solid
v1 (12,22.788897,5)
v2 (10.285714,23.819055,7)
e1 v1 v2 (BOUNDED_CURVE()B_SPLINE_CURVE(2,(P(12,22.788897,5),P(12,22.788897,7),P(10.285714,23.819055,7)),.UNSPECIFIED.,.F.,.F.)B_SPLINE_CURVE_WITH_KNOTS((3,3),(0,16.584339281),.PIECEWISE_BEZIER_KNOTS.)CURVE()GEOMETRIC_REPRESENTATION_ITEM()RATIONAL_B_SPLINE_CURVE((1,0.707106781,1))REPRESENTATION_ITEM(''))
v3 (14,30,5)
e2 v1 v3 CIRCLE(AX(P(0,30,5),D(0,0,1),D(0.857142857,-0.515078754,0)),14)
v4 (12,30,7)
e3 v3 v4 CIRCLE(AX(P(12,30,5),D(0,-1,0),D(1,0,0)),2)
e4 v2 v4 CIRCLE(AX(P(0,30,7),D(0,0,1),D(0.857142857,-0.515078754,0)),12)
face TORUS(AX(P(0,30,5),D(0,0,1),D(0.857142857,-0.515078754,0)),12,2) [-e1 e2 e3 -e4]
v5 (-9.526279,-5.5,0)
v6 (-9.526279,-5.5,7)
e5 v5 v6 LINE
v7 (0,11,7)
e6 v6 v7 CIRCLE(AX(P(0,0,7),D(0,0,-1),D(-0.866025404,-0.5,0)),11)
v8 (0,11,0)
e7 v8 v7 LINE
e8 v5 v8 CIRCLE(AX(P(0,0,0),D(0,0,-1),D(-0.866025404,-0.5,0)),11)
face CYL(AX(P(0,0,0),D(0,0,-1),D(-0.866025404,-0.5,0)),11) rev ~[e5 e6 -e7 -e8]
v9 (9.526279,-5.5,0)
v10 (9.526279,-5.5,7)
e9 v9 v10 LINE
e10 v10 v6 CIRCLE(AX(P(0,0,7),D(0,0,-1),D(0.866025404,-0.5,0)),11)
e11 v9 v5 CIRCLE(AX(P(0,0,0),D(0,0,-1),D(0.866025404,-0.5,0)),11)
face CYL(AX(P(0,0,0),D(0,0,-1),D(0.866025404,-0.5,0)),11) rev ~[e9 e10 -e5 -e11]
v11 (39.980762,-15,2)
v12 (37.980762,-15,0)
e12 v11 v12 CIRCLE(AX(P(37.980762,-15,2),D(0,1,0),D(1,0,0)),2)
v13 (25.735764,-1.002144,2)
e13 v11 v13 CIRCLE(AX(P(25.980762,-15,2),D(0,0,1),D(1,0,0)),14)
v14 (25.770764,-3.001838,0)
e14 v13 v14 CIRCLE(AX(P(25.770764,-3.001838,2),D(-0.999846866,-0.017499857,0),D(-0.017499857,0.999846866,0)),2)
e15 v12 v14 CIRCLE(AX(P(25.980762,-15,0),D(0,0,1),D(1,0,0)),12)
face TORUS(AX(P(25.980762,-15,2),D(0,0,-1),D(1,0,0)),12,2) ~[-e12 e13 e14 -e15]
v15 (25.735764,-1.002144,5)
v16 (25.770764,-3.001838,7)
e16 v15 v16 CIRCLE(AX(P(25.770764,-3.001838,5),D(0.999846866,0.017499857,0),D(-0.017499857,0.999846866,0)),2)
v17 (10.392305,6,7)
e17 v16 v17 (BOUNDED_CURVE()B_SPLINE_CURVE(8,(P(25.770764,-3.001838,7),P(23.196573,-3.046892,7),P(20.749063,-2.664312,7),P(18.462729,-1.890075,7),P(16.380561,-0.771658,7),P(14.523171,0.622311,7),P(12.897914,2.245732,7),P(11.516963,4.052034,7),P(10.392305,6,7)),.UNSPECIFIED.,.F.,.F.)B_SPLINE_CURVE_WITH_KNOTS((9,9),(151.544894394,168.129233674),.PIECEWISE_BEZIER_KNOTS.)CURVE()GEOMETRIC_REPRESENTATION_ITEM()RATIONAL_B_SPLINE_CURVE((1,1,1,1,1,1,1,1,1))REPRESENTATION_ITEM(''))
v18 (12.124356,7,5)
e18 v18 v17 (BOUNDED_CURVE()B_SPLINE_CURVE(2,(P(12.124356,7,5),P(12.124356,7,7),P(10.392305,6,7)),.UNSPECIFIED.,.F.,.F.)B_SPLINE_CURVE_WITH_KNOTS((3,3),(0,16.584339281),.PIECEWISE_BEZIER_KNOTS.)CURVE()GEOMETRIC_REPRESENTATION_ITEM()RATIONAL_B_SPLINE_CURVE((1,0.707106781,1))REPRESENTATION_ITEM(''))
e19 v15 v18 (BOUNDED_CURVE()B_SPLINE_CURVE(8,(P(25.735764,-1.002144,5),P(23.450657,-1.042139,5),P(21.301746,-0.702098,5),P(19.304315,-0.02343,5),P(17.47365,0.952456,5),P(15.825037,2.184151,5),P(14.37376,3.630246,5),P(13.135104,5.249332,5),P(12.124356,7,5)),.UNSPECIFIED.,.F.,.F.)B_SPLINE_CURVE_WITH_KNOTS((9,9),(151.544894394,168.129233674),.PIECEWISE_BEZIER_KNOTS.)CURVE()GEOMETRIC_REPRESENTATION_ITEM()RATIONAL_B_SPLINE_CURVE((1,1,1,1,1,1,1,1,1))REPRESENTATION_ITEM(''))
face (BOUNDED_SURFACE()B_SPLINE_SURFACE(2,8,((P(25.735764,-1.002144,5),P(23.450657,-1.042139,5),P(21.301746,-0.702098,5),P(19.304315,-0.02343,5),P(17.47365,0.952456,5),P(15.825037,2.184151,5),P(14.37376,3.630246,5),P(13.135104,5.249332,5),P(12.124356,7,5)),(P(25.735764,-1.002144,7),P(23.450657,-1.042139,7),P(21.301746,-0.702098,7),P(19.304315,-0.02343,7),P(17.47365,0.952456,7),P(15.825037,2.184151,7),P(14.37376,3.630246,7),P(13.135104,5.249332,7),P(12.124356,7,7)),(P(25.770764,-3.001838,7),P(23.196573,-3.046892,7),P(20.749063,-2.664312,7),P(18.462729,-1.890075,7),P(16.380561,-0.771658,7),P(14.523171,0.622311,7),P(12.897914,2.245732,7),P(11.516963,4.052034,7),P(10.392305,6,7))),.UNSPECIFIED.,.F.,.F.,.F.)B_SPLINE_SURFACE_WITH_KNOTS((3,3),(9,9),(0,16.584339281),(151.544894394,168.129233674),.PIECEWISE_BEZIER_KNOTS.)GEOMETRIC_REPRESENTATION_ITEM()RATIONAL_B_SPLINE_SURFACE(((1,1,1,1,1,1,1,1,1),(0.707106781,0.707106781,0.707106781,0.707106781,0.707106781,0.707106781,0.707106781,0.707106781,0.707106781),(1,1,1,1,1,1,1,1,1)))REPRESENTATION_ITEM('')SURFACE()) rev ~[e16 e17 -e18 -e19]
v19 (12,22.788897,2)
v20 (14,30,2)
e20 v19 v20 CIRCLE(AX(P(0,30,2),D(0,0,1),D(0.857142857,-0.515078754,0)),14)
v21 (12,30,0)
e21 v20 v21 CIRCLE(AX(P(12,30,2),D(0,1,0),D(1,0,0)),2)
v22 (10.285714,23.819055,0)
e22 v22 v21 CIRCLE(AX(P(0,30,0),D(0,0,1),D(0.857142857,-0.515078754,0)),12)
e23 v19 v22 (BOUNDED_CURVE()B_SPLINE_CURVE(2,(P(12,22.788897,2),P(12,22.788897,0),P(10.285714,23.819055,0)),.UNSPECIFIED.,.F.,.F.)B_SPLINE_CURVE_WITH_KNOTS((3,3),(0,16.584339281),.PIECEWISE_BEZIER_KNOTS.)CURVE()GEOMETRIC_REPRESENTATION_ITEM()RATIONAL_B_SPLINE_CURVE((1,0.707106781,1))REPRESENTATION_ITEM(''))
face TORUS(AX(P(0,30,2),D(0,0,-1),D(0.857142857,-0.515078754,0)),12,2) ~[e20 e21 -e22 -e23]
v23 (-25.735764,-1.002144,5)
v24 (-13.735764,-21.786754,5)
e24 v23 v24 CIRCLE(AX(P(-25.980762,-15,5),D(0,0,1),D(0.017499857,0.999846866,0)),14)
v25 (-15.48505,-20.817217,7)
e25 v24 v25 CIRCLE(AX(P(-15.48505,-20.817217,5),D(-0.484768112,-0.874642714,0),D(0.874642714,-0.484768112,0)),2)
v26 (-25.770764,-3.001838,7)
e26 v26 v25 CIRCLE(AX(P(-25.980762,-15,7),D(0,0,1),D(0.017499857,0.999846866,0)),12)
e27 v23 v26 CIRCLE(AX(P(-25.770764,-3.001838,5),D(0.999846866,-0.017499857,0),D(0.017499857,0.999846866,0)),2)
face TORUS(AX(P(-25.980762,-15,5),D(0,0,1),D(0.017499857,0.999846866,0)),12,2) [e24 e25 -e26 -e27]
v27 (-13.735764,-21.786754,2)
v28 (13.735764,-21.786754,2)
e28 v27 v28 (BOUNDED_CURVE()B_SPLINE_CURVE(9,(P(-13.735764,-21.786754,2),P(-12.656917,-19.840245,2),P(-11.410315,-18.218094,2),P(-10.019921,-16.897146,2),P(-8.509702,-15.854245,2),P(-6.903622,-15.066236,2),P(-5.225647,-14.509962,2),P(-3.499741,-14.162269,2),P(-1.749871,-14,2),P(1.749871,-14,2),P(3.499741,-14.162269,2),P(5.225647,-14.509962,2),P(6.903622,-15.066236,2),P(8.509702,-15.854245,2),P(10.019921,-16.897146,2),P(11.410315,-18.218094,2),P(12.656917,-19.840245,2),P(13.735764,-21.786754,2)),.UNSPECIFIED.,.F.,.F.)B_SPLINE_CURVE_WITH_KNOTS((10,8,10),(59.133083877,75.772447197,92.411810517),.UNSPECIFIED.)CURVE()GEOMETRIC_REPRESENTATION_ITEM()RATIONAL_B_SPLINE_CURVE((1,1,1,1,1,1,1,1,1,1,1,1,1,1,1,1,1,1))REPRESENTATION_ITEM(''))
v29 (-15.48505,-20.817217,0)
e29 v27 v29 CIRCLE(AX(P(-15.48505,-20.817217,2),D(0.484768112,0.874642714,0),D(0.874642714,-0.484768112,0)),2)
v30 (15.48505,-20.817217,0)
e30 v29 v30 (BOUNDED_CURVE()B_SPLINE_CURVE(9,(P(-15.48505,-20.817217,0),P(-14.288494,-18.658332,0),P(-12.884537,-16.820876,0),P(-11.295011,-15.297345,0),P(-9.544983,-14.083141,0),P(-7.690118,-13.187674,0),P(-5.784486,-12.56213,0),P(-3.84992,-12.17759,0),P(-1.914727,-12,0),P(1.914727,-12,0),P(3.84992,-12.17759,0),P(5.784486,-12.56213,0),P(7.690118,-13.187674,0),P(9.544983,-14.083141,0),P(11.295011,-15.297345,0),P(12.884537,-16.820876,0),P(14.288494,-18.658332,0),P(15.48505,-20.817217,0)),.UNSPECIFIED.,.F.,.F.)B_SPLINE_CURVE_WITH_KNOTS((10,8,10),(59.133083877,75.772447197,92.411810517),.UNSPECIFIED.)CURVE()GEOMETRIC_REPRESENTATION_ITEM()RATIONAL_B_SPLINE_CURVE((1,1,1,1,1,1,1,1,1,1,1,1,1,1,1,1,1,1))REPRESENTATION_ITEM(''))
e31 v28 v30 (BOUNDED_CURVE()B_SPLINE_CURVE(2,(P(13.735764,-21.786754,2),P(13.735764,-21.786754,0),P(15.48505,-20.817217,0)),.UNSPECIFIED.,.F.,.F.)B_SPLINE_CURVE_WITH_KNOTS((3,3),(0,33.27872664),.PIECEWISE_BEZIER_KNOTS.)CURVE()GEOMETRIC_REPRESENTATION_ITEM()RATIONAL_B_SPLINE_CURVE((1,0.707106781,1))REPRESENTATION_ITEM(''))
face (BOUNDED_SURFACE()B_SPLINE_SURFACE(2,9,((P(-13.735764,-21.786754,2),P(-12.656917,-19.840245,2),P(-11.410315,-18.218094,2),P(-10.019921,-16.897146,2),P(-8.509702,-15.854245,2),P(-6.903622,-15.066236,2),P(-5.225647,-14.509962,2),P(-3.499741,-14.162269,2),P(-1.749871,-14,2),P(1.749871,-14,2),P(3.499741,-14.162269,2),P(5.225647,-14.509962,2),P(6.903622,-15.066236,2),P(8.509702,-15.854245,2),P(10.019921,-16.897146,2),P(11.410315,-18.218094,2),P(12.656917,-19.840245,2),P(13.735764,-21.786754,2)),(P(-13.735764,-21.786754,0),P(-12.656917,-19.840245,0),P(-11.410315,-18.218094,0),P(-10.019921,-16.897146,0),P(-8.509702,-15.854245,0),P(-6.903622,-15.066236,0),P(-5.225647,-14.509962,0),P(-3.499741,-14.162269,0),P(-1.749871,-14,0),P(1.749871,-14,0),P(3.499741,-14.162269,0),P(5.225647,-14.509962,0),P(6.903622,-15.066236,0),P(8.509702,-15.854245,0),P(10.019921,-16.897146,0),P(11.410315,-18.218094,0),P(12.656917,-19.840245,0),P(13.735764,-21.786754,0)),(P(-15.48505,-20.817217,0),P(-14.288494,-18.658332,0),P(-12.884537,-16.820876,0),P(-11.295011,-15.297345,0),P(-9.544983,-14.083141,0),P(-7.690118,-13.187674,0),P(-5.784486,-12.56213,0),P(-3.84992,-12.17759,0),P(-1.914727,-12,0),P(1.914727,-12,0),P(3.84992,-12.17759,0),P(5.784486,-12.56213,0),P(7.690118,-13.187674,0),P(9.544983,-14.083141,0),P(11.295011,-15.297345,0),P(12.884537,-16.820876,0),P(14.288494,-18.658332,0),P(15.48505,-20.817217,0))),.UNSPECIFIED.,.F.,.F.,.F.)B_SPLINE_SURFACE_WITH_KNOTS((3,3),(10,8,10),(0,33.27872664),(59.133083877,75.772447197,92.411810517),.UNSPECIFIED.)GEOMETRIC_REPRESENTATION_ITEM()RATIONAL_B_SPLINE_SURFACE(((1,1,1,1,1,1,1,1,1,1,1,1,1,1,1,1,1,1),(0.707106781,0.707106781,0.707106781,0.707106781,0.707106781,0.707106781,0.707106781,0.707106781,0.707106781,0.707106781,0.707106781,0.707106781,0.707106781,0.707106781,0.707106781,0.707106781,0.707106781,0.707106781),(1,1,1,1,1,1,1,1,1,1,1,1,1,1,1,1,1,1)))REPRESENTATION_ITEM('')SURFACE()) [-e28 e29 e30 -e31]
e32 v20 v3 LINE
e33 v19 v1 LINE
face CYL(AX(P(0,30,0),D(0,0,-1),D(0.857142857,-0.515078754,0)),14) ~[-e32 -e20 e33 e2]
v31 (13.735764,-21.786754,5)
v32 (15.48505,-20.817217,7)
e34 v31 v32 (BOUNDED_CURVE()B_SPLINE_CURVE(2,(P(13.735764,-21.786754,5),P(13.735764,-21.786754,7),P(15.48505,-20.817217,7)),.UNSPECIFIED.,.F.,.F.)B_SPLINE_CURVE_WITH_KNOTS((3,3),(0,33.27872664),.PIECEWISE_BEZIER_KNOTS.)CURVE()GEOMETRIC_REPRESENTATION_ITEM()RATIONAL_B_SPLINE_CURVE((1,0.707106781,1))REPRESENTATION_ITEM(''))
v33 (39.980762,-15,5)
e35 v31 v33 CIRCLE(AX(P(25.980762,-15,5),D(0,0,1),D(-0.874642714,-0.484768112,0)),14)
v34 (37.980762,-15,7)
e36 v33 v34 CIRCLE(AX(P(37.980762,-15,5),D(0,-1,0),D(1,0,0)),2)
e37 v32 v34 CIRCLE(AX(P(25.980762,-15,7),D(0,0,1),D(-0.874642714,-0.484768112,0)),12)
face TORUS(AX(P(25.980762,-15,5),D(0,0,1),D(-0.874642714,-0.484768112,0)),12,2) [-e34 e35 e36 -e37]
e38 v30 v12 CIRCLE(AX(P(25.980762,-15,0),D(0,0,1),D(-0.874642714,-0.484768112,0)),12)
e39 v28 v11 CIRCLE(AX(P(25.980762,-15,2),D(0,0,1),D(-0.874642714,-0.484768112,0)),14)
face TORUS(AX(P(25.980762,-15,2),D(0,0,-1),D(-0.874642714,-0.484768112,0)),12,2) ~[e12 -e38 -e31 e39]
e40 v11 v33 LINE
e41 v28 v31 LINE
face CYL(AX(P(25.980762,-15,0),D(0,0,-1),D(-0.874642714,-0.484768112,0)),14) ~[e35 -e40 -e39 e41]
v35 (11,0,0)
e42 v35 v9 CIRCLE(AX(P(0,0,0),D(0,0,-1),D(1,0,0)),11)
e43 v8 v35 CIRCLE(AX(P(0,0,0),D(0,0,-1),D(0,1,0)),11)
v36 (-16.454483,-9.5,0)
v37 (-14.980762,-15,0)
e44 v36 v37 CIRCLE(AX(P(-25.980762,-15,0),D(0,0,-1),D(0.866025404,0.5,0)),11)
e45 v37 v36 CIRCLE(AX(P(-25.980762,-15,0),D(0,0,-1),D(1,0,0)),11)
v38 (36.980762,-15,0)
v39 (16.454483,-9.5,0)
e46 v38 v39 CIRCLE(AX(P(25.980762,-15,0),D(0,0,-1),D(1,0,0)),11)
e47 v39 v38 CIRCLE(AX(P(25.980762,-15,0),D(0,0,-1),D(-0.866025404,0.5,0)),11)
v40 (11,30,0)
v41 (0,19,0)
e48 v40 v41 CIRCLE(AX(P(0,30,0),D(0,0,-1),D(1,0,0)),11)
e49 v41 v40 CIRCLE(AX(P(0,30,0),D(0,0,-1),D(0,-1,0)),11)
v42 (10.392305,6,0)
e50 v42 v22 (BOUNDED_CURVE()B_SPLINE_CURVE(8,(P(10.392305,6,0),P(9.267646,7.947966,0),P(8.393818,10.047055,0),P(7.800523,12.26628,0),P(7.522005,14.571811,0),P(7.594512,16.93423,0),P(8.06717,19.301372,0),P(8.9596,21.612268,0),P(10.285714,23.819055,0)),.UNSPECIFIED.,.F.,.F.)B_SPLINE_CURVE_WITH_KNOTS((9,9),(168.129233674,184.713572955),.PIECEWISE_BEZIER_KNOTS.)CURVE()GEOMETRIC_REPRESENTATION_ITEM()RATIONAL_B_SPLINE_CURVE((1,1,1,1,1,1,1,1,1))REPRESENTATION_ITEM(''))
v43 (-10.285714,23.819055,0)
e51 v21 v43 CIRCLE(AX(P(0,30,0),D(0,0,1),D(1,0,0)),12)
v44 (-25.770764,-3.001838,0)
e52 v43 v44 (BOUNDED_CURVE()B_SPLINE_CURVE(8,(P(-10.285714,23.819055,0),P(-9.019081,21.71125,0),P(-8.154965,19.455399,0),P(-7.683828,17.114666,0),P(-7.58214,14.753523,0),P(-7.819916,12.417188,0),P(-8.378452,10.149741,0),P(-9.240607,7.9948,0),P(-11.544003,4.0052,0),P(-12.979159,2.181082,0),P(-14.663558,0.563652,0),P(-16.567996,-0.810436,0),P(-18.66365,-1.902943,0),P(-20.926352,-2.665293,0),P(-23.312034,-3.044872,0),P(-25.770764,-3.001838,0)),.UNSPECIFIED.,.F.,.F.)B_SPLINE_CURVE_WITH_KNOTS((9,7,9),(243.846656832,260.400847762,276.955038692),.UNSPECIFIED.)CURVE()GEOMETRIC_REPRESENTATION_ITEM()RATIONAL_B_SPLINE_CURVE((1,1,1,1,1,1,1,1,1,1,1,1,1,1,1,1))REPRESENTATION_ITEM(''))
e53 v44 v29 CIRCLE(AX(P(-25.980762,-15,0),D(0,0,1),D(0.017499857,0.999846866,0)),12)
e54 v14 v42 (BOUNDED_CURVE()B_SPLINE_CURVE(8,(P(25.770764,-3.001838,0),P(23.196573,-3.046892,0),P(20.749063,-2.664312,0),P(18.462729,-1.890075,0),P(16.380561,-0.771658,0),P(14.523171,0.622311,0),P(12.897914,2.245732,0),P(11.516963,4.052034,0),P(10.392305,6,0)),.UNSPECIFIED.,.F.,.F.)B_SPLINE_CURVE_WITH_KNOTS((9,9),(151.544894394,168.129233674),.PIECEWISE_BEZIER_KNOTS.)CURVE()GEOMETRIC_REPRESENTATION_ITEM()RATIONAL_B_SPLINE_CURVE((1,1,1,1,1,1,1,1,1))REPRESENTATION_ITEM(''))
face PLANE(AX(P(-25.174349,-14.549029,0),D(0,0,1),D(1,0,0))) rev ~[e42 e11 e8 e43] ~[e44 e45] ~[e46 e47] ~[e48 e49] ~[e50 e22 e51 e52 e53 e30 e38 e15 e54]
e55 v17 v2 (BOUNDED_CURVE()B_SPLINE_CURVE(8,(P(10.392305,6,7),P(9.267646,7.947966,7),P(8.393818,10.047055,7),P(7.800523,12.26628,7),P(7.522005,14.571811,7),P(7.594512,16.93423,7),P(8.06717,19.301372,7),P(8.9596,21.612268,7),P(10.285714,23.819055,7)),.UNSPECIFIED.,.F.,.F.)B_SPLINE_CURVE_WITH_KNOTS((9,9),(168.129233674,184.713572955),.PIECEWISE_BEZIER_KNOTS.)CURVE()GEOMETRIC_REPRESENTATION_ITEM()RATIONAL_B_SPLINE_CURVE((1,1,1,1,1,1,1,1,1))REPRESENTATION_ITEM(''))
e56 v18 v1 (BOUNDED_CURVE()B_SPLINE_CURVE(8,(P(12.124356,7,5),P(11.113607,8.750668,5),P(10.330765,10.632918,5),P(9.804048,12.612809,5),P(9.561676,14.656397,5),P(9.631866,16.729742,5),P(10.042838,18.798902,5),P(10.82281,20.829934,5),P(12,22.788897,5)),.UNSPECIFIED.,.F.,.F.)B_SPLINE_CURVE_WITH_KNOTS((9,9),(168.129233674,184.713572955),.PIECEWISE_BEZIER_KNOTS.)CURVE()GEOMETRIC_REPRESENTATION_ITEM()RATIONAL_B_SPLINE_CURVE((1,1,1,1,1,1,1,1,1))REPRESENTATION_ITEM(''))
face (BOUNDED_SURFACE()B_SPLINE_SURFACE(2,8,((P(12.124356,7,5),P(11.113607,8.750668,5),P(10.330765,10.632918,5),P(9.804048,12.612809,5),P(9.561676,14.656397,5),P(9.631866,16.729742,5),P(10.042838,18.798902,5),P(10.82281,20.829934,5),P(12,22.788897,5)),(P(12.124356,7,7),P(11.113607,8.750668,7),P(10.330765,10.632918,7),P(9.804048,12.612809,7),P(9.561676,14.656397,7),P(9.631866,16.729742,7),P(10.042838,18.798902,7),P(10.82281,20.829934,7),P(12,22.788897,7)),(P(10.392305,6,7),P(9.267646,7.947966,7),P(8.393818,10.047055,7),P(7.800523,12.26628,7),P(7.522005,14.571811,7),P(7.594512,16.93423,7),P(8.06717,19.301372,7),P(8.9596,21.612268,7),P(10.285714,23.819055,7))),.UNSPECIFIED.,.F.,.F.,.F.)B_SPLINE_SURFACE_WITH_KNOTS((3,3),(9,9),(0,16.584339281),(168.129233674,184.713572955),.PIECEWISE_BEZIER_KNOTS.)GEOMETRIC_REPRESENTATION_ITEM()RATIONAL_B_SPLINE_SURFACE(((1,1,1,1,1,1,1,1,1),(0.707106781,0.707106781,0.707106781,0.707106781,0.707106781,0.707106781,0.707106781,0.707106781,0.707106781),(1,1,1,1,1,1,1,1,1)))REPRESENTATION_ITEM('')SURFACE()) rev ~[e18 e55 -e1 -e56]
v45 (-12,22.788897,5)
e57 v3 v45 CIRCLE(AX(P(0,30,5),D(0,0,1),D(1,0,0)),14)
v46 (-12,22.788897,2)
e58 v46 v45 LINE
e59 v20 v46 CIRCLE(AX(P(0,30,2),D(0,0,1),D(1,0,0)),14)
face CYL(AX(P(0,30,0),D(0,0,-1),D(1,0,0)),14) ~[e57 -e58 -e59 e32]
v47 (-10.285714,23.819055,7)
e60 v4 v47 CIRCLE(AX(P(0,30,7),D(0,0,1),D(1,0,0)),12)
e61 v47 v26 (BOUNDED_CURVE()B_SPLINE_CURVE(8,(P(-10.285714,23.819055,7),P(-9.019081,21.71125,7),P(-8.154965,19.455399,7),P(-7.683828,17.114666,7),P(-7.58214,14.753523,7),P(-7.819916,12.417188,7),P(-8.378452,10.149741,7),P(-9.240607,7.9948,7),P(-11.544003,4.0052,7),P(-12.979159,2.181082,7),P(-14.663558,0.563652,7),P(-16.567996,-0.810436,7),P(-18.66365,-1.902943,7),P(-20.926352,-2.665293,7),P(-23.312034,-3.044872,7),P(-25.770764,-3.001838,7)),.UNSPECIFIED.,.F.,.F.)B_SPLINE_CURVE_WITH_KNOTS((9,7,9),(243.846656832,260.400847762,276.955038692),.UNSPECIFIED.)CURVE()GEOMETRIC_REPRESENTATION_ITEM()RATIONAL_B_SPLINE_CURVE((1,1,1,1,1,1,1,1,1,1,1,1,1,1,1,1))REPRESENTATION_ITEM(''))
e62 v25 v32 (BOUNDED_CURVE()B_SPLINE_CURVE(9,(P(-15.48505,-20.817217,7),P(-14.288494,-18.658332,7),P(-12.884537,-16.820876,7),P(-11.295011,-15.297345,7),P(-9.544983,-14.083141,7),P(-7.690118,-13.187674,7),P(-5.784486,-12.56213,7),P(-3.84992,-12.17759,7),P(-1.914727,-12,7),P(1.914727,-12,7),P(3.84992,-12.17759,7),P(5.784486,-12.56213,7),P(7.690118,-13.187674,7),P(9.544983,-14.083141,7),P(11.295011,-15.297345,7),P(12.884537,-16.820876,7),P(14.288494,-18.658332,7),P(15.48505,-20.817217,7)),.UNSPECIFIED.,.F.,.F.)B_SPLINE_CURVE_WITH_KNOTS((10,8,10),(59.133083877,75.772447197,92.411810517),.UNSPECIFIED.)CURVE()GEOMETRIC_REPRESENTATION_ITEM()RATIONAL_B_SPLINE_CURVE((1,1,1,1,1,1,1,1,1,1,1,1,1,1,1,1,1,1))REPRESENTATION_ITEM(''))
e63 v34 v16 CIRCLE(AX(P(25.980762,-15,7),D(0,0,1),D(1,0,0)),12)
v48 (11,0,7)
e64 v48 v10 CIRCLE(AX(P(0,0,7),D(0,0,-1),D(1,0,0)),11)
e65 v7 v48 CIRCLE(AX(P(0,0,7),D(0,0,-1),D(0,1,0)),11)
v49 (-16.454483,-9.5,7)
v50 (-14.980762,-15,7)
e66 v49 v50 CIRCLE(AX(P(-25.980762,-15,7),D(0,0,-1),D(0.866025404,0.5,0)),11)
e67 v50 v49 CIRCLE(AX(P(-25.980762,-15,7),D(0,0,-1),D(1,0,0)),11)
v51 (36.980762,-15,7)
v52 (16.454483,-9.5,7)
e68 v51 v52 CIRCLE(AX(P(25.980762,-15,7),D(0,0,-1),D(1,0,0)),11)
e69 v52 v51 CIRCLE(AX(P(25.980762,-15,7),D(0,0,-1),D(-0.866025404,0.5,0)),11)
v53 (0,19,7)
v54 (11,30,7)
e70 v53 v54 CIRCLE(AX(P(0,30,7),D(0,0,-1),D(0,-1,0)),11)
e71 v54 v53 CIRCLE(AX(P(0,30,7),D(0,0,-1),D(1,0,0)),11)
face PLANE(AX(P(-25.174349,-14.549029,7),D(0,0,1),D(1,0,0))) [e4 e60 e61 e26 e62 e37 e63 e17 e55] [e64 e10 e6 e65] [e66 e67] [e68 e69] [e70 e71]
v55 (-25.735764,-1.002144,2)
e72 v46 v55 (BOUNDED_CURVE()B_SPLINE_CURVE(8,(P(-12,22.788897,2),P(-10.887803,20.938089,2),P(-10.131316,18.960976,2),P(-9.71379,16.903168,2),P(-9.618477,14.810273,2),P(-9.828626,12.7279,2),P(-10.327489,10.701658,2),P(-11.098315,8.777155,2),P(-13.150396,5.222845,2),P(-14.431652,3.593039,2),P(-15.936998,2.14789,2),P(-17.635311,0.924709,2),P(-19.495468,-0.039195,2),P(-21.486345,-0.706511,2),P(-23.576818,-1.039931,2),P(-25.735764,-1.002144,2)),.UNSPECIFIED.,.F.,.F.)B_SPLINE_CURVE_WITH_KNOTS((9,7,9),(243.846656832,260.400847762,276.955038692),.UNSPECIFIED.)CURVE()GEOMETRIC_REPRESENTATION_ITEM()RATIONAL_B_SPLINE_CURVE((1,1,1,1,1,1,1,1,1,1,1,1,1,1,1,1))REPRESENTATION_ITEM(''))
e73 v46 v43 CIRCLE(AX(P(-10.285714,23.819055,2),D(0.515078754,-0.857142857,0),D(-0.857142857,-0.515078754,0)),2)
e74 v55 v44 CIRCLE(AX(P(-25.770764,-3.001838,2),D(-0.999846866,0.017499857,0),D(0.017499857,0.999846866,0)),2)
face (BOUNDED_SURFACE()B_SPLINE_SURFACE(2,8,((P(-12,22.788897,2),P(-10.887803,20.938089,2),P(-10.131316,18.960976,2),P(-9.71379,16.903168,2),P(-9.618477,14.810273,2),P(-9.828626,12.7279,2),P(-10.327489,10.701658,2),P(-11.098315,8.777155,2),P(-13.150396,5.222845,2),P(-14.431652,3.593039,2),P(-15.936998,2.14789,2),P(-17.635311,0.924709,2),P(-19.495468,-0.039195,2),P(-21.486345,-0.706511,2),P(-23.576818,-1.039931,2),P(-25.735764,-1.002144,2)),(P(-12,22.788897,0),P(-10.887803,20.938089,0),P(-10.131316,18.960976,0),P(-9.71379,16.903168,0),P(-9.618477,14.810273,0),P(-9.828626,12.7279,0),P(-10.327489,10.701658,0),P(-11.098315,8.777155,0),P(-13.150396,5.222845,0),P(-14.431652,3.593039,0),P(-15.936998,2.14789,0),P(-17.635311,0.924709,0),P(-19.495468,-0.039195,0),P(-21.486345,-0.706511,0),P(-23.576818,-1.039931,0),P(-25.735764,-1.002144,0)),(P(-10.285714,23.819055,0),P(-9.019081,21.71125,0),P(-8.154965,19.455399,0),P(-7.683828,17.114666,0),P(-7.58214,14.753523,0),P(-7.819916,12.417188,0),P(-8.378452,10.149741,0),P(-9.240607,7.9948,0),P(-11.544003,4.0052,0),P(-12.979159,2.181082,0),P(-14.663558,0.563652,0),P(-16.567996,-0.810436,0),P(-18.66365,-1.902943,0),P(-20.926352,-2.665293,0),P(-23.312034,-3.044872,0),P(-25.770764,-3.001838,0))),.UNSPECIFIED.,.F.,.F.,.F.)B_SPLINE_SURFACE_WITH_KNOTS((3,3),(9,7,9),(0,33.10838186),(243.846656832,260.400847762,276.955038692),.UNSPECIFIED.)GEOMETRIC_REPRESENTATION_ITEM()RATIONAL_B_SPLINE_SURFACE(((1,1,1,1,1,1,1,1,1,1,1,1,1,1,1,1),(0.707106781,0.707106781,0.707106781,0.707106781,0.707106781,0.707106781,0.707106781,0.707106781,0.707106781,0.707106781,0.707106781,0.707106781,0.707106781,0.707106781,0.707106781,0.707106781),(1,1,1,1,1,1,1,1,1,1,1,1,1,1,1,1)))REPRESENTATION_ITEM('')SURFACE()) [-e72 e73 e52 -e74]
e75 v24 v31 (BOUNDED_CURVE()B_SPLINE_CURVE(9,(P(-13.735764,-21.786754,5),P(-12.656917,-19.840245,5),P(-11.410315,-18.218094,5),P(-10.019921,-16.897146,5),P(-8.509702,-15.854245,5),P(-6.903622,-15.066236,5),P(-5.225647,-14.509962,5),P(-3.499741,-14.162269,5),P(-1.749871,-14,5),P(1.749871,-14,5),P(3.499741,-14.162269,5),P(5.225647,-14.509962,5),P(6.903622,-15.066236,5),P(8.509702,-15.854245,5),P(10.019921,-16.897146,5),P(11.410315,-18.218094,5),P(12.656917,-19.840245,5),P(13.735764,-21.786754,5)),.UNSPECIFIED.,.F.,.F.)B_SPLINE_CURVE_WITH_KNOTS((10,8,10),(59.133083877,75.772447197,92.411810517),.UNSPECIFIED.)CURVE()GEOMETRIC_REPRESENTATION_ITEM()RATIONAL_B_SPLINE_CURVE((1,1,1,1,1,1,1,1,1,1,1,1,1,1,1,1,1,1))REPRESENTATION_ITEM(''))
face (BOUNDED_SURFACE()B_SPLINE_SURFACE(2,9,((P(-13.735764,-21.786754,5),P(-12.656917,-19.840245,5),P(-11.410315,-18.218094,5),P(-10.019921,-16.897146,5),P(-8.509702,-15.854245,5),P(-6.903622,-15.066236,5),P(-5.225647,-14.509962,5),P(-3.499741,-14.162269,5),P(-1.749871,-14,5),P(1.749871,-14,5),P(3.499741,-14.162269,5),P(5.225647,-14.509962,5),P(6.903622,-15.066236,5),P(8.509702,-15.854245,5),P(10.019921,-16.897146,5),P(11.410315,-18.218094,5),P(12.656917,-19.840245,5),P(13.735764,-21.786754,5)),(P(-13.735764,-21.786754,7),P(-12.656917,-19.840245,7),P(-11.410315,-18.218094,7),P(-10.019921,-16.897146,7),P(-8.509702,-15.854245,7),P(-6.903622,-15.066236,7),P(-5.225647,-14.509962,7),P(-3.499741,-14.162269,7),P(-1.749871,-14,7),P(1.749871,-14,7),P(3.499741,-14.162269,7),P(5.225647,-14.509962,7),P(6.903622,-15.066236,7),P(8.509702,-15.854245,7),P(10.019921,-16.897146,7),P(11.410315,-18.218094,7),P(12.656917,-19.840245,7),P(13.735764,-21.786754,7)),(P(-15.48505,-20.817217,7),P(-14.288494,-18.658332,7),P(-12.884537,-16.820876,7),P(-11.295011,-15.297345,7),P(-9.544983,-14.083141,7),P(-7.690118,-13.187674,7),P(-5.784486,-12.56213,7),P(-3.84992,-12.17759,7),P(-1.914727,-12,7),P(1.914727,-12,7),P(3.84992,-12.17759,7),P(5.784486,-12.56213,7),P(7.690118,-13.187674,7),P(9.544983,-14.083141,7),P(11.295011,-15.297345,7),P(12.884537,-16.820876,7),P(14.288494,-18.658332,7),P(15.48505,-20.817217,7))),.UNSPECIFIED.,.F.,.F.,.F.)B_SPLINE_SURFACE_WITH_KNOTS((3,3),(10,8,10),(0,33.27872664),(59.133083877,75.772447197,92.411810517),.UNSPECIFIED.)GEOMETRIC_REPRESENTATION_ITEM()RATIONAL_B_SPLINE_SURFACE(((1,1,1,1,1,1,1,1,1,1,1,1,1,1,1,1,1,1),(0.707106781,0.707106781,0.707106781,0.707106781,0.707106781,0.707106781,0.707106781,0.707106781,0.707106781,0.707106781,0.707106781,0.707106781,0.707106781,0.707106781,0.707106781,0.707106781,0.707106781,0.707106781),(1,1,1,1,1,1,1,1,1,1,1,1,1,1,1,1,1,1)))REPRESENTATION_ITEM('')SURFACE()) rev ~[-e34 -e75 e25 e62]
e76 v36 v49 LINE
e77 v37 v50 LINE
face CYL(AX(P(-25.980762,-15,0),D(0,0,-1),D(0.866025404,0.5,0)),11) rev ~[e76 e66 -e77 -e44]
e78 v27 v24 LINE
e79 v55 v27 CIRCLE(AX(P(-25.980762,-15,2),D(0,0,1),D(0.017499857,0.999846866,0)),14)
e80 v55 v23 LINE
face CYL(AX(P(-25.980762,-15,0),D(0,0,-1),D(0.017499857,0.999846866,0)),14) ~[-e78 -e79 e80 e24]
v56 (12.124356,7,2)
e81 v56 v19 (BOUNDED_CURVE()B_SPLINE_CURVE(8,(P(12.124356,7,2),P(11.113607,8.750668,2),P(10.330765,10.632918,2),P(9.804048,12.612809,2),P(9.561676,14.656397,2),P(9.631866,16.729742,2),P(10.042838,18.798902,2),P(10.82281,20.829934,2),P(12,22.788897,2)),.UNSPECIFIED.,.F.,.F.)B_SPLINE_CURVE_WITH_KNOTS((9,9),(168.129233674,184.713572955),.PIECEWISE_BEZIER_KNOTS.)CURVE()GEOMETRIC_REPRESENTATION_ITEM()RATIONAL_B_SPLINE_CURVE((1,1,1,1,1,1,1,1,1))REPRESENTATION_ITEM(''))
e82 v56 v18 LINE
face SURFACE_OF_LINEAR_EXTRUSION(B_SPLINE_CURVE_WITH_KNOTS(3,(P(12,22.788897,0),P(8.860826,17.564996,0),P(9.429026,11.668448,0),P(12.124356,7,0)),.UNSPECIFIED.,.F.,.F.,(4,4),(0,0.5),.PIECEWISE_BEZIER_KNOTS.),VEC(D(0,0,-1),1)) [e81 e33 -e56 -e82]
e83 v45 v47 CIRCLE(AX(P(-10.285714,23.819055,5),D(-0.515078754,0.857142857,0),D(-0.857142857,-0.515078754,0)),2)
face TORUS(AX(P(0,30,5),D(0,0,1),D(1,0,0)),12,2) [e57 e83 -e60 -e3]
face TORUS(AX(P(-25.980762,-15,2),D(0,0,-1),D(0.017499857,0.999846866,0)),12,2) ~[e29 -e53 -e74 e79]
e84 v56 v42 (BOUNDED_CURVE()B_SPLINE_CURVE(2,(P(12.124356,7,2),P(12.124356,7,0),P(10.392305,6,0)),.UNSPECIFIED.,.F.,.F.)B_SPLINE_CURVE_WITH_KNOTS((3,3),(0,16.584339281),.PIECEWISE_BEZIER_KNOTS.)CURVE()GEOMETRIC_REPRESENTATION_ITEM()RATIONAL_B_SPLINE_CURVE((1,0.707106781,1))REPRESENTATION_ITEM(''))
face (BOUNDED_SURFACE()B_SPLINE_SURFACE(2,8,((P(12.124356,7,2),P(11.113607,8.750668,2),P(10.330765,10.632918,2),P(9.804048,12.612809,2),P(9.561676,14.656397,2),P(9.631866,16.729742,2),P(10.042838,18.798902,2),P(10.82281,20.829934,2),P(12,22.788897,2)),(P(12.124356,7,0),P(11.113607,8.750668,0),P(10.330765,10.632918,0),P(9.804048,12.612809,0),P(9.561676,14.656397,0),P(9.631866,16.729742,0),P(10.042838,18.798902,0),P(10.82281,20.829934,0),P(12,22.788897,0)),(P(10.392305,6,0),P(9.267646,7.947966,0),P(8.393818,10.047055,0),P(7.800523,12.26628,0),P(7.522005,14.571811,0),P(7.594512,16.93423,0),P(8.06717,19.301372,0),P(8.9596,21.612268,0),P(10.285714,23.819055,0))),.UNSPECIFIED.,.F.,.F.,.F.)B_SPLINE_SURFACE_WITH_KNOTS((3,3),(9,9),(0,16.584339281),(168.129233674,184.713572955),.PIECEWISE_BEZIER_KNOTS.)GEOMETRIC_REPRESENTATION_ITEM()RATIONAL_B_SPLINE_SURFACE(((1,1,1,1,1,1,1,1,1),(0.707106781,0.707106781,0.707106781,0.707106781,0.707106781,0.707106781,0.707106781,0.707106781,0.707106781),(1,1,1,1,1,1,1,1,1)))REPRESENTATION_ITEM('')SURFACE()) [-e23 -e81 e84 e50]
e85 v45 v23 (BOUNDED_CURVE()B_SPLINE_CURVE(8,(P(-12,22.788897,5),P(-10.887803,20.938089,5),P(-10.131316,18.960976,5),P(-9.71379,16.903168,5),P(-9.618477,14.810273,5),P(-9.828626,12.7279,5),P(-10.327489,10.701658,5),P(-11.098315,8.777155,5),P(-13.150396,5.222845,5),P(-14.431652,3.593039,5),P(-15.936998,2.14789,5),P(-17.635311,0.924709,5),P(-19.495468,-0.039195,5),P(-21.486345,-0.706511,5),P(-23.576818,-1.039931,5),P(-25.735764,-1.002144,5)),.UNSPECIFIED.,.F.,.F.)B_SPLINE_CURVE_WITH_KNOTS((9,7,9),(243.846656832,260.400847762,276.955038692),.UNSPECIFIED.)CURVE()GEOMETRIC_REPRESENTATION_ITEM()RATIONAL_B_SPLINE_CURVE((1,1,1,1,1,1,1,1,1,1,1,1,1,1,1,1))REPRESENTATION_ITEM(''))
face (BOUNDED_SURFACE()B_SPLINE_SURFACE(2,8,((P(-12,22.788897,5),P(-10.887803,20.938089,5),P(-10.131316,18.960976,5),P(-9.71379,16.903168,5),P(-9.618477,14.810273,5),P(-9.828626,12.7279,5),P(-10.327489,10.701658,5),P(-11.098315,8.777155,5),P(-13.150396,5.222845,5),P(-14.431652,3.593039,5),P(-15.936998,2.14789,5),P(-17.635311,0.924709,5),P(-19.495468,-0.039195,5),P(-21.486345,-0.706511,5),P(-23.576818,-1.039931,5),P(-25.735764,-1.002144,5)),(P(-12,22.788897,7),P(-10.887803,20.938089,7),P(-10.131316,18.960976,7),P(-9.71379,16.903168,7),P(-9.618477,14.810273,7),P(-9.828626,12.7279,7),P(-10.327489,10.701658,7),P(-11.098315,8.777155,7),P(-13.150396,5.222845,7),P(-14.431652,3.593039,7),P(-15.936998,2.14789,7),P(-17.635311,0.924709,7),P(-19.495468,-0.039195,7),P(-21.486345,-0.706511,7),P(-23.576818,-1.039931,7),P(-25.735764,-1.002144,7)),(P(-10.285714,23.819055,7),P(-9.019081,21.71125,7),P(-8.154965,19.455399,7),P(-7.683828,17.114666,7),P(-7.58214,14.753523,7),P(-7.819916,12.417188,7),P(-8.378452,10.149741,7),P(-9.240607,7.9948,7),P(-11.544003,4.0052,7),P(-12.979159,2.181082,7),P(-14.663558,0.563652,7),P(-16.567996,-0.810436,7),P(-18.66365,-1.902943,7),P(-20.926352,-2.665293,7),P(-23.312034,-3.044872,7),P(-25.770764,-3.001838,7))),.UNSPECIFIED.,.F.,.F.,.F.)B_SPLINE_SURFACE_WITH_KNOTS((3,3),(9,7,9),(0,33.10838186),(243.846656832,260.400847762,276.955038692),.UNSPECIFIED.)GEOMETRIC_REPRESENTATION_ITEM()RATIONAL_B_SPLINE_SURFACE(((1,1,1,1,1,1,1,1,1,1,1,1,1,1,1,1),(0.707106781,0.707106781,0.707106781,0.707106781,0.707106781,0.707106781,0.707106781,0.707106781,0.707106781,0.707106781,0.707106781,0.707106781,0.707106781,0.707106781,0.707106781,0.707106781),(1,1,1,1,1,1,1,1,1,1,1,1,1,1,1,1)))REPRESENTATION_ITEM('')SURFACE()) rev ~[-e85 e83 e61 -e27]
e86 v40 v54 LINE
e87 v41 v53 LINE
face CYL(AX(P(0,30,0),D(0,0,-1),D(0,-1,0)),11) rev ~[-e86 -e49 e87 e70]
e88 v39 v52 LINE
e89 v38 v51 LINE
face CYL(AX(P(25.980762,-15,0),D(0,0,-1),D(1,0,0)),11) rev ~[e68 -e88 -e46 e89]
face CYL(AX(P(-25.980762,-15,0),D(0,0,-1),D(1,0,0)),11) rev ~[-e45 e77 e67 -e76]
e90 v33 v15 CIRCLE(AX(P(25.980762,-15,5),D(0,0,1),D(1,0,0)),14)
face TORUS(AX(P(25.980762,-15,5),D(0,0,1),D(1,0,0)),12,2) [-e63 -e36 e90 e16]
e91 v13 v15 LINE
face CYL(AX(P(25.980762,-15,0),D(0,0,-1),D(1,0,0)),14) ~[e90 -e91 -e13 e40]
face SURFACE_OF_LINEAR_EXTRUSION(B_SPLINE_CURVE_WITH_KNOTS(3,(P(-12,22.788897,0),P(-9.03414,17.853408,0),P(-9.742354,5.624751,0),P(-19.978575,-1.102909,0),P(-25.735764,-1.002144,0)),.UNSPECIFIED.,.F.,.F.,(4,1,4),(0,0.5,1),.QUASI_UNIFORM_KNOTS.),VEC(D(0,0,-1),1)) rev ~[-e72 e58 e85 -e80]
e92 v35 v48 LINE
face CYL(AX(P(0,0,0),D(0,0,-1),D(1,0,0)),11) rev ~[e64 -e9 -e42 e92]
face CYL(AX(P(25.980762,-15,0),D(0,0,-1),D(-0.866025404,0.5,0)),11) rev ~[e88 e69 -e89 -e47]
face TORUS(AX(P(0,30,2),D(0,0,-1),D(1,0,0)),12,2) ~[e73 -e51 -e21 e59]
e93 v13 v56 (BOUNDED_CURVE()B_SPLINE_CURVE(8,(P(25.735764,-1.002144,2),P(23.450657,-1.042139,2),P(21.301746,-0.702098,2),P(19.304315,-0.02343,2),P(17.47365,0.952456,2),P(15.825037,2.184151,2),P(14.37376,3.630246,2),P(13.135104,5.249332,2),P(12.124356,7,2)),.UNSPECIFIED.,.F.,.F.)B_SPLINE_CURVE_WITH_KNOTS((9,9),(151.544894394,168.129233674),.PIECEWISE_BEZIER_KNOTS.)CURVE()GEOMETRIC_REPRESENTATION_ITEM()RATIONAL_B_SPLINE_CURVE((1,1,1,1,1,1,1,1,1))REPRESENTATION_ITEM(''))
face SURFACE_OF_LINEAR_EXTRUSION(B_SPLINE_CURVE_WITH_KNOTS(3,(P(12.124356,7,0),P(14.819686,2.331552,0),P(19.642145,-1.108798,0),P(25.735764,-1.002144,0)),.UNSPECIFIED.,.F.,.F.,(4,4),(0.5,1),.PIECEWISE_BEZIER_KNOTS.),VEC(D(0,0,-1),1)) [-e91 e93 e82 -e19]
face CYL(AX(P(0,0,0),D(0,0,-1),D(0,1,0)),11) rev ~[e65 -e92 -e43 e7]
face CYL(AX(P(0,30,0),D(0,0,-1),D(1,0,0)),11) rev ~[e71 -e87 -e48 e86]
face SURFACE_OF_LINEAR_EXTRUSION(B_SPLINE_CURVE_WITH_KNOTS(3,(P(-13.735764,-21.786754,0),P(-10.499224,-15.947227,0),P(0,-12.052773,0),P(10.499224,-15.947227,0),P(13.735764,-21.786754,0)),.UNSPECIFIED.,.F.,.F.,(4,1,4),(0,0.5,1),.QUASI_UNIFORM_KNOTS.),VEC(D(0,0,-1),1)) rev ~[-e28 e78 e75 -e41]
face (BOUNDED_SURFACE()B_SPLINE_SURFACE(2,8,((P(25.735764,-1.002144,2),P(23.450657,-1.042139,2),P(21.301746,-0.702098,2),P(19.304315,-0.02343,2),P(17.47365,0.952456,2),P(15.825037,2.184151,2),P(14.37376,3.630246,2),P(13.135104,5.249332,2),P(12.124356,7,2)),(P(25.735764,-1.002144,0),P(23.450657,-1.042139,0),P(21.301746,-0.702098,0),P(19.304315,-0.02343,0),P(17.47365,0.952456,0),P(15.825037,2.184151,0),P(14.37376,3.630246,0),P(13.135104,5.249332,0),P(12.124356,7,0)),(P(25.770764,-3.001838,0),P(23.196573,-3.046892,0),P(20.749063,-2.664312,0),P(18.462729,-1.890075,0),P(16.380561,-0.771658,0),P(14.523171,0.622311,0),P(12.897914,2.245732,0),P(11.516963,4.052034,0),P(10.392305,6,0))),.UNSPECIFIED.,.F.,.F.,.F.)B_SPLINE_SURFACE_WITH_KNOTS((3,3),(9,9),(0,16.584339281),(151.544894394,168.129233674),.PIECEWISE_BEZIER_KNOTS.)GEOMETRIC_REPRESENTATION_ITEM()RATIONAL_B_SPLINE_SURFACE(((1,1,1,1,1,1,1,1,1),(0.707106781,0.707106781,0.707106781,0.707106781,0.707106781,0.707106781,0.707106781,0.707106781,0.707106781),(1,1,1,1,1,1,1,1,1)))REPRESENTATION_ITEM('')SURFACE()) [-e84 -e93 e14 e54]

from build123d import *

# Parameters (mm, degrees)
F1_DEPTH = 7
F2_R     = 2


with BuildPart() as f1:
    # F0 (on Top) → F1 (new body)
    with BuildSketch(Plane.XY):
        with BuildLine():
            ThreePointArc((-11.9807621135, -15), (-12.4578005455, -11.3765333686), (-13.8564064606, -8))
            ThreePointArc((-13.8564064606, -8), (-18.8749387967, -2.9373603639), (-25.7357641151, -1.0021438791))
            ThreePointArc((-25.7357641151, -1.0021438791), (-38.1051177665, -22), (-13.7357641151, -21.7867535699))
            ThreePointArc((-13.7357641151, -21.7867535699), (-12.4266119746, -18.5049984324), (-11.9807621135, -15))
        make_face()
        with BuildLine():
            ThreePointArc((-14.9807621135, -15), (-36.6059462027, -17.8470094961), (-16.4544826719, -9.5))
            ThreePointArc((-16.4544826719, -9.5), (-15.3555780244, -12.1529905039), (-14.9807621135, -15))
        make_face(mode=Mode.SUBTRACT)
        with BuildLine():
            ThreePointArc((-9.5262794416, -5.5), (-9.5262794416, 5.5), (0, 11))
            Line((0, 11), (0, 14))
            ThreePointArc((0, 14), (-7.0000000057, 12.1243556497), (-12.1243556595, 6.9999999886))
            ThreePointArc((-12.1243556595, 6.9999999886), (-14, -6.6e-09), (-12.124355653, -7))
            Line((-12.124355653, -7), (-9.5262794416, -5.5))
        make_face()
        with BuildLine():
            Line((-13.8564064606, -8), (-12.124355653, -7))
            ThreePointArc((-12.124355653, -7), (-14, -6.6e-09), (-12.1243556595, 6.9999999886))
            add(Edge.make_bspline(
                [(-12.124355653, 7), (-14.8604643909, 2.2609206509), (-19.9785749652, -1.1029092968), (-25.7357641151, -1.0021438791)],
                knots=[0.5, 0.5, 0.5, 0.5, 1, 1, 1, 1], degree=3))
            ThreePointArc((-25.7357641151, -1.0021438791), (-18.8749387967, -2.9373603639), (-13.8564064606, -8))
        make_face()
        with BuildLine():
            Line((12.124355653, -7), (9.5262794416, -5.5))
            ThreePointArc((9.5262794416, -5.5), (0, -11), (-9.5262794416, -5.5))
            Line((-9.5262794416, -5.5), (-12.124355653, -7))
            ThreePointArc((-12.124355653, -7), (-6.9999999959, -12.1243556553), (9.4e-09, -14))
            ThreePointArc((9.4e-09, -14), (7.0000000041, -12.1243556506), (12.124355653, -7))
        make_face()
        with BuildLine():
            ThreePointArc((9.4e-09, -14), (-6.9999999959, -12.1243556553), (-12.124355653, -7))
            Line((-12.124355653, -7), (-13.8564064606, -8))
            ThreePointArc((-13.8564064606, -8), (-12.4578005455, -11.3765333686), (-11.9807621135, -15))
            ThreePointArc((-11.9807621135, -15), (-12.4266119746, -18.5049984324), (-13.7357641151, -21.7867535699))
            add(Edge.make_bspline(
                [(-13.7357641151, -21.7867535699), (-10.4992239257, -15.947226949), (-5.2496119628, -14), (0, -14)],
                knots=[0, 0, 0, 0, 0.5, 0.5, 0.5, 0.5], degree=3))
        make_face()
        with BuildLine():
            Line((13.8564064606, -8), (12.124355653, -7))
            ThreePointArc((12.124355653, -7), (7.0000000041, -12.1243556506), (9.4e-09, -14))
            add(Edge.make_bspline(
                [(0, -14), (5.2496119628, -14), (10.4992239257, -15.947226949), (13.7357641151, -21.7867535699)],
                knots=[0.5, 0.5, 0.5, 0.5, 1, 1, 1, 1], degree=3))
            ThreePointArc((13.7357641151, -21.7867535699), (11.9812980936, -14.8774963108), (13.8564064606, -8))
        make_face()
        with BuildLine():
            ThreePointArc((0, 11), (7.7781745931, 7.7781745931), (11, 0))
            ThreePointArc((11, 0), (10.6251840892, -2.8470094961), (9.5262794416, -5.5))
            Line((9.5262794416, -5.5), (12.124355653, -7))
            ThreePointArc((12.124355653, -7), (13.522961568, -3.6234666314), (14, 0))
            ThreePointArc((14, 0), (13.5229615737, 3.6234666105), (12.1243556746, 6.9999999625))
            ThreePointArc((12.1243556746, 6.9999999625), (7.0000000188, 12.1243556422), (0, 14))
            Line((0, 14), (0, 11))
        make_face()
        with BuildLine():
            ThreePointArc((25.7357641151, -1.0021438791), (18.8749387967, -2.9373603639), (13.8564064606, -8))
            ThreePointArc((13.8564064606, -8), (11.9812980936, -14.8774963108), (13.7357641151, -21.7867535699))
            ThreePointArc((13.7357641151, -21.7867535699), (29.4857605459, -28.5541501389), (39.9807621135, -15))
            ThreePointArc((39.9807621135, -15), (35.7932548657, -5.0142608692), (25.7357641151, -1.0021438791))
        make_face()
        with BuildLine():
            ThreePointArc((36.9807621135, -15), (23.1337526174, -25.6251840892), (16.4544826719, -9.5))
            ThreePointArc((16.4544826719, -9.5), (28.8277716097, -4.3748159108), (36.9807621135, -15))
        make_face(mode=Mode.SUBTRACT)
        with BuildLine():
            ThreePointArc((14, 0), (13.522961568, -3.6234666314), (12.124355653, -7))
            Line((12.124355653, -7), (13.8564064606, -8))
            ThreePointArc((13.8564064606, -8), (18.8749387967, -2.9373603639), (25.7357641151, -1.0021438791))
            add(Edge.make_bspline(
                [(12.124355653, 7), (14.8196855562, 2.3315516644), (19.6421453279, -1.108797669), (25.7357641151, -1.0021438791)],
                knots=[0.5, 0.5, 0.5, 0.5, 1, 1, 1, 1], degree=3))
            ThreePointArc((12.1243556746, 6.9999999625), (13.5229615737, 3.6234666105), (14, 0))
        make_face()
        with BuildLine():
            Line((0, 16), (0, 14))
            ThreePointArc((0, 14), (7.0000000188, 12.1243556422), (12.1243556746, 6.9999999625))
            add(Edge.make_bspline(
                [(12, 22.7888974491), (8.8608257149, 17.5649956733), (9.4290257497, 11.6684483356), (12.124355653, 7)],
                knots=[0, 0, 0, 0, 0.5, 0.5, 0.5, 0.5], degree=3))
            ThreePointArc((12, 22.7888974491), (6.8936407031, 17.8148566748), (0, 16))
        make_face()
        with BuildLine():
            ThreePointArc((-12.1243556595, 6.9999999886), (-7.0000000057, 12.1243556497), (0, 14))
            Line((0, 14), (0, 16))
            ThreePointArc((0, 16), (-6.8936407031, 17.8148566748), (-12, 22.7888974491))
            add(Edge.make_bspline(
                [(-12, 22.7888974491), (-9.0341400135, 17.8534080997), (-9.3882469151, 11.7390793491), (-12.124355653, 7)],
                knots=[0, 0, 0, 0, 0.5, 0.5, 0.5, 0.5], degree=3))
        make_face()
        with BuildLine():
            ThreePointArc((-12, 22.7888974491), (-6.8936407031, 17.8148566748), (0, 16))
            ThreePointArc((0, 16), (6.8936407031, 17.8148566748), (12, 22.7888974491))
            ThreePointArc((12, 22.7888974491), (13.4907375632, 26.2583426132), (14, 30))
            ThreePointArc((14, 30), (-3.7416573868, 43.4907375632), (-12, 22.7888974491))
        make_face()
        with BuildLine():
            ThreePointArc((11, 30), (7.7781745931, 22.2218254069), (0, 19))
            ThreePointArc((0, 19), (-7.7781745931, 37.7781745931), (11, 30))
        make_face(mode=Mode.SUBTRACT)
    extrude(amount=F1_DEPTH)

    # F2
    f2_edges = [f1.edges().sort_by_distance(p)[0] for p in [
        (-38.105118, -22, 0),
        (-38.105118, -22, 7),
    ]]
    fillet(f2_edges, radius=F2_R)


solid = f1.part
